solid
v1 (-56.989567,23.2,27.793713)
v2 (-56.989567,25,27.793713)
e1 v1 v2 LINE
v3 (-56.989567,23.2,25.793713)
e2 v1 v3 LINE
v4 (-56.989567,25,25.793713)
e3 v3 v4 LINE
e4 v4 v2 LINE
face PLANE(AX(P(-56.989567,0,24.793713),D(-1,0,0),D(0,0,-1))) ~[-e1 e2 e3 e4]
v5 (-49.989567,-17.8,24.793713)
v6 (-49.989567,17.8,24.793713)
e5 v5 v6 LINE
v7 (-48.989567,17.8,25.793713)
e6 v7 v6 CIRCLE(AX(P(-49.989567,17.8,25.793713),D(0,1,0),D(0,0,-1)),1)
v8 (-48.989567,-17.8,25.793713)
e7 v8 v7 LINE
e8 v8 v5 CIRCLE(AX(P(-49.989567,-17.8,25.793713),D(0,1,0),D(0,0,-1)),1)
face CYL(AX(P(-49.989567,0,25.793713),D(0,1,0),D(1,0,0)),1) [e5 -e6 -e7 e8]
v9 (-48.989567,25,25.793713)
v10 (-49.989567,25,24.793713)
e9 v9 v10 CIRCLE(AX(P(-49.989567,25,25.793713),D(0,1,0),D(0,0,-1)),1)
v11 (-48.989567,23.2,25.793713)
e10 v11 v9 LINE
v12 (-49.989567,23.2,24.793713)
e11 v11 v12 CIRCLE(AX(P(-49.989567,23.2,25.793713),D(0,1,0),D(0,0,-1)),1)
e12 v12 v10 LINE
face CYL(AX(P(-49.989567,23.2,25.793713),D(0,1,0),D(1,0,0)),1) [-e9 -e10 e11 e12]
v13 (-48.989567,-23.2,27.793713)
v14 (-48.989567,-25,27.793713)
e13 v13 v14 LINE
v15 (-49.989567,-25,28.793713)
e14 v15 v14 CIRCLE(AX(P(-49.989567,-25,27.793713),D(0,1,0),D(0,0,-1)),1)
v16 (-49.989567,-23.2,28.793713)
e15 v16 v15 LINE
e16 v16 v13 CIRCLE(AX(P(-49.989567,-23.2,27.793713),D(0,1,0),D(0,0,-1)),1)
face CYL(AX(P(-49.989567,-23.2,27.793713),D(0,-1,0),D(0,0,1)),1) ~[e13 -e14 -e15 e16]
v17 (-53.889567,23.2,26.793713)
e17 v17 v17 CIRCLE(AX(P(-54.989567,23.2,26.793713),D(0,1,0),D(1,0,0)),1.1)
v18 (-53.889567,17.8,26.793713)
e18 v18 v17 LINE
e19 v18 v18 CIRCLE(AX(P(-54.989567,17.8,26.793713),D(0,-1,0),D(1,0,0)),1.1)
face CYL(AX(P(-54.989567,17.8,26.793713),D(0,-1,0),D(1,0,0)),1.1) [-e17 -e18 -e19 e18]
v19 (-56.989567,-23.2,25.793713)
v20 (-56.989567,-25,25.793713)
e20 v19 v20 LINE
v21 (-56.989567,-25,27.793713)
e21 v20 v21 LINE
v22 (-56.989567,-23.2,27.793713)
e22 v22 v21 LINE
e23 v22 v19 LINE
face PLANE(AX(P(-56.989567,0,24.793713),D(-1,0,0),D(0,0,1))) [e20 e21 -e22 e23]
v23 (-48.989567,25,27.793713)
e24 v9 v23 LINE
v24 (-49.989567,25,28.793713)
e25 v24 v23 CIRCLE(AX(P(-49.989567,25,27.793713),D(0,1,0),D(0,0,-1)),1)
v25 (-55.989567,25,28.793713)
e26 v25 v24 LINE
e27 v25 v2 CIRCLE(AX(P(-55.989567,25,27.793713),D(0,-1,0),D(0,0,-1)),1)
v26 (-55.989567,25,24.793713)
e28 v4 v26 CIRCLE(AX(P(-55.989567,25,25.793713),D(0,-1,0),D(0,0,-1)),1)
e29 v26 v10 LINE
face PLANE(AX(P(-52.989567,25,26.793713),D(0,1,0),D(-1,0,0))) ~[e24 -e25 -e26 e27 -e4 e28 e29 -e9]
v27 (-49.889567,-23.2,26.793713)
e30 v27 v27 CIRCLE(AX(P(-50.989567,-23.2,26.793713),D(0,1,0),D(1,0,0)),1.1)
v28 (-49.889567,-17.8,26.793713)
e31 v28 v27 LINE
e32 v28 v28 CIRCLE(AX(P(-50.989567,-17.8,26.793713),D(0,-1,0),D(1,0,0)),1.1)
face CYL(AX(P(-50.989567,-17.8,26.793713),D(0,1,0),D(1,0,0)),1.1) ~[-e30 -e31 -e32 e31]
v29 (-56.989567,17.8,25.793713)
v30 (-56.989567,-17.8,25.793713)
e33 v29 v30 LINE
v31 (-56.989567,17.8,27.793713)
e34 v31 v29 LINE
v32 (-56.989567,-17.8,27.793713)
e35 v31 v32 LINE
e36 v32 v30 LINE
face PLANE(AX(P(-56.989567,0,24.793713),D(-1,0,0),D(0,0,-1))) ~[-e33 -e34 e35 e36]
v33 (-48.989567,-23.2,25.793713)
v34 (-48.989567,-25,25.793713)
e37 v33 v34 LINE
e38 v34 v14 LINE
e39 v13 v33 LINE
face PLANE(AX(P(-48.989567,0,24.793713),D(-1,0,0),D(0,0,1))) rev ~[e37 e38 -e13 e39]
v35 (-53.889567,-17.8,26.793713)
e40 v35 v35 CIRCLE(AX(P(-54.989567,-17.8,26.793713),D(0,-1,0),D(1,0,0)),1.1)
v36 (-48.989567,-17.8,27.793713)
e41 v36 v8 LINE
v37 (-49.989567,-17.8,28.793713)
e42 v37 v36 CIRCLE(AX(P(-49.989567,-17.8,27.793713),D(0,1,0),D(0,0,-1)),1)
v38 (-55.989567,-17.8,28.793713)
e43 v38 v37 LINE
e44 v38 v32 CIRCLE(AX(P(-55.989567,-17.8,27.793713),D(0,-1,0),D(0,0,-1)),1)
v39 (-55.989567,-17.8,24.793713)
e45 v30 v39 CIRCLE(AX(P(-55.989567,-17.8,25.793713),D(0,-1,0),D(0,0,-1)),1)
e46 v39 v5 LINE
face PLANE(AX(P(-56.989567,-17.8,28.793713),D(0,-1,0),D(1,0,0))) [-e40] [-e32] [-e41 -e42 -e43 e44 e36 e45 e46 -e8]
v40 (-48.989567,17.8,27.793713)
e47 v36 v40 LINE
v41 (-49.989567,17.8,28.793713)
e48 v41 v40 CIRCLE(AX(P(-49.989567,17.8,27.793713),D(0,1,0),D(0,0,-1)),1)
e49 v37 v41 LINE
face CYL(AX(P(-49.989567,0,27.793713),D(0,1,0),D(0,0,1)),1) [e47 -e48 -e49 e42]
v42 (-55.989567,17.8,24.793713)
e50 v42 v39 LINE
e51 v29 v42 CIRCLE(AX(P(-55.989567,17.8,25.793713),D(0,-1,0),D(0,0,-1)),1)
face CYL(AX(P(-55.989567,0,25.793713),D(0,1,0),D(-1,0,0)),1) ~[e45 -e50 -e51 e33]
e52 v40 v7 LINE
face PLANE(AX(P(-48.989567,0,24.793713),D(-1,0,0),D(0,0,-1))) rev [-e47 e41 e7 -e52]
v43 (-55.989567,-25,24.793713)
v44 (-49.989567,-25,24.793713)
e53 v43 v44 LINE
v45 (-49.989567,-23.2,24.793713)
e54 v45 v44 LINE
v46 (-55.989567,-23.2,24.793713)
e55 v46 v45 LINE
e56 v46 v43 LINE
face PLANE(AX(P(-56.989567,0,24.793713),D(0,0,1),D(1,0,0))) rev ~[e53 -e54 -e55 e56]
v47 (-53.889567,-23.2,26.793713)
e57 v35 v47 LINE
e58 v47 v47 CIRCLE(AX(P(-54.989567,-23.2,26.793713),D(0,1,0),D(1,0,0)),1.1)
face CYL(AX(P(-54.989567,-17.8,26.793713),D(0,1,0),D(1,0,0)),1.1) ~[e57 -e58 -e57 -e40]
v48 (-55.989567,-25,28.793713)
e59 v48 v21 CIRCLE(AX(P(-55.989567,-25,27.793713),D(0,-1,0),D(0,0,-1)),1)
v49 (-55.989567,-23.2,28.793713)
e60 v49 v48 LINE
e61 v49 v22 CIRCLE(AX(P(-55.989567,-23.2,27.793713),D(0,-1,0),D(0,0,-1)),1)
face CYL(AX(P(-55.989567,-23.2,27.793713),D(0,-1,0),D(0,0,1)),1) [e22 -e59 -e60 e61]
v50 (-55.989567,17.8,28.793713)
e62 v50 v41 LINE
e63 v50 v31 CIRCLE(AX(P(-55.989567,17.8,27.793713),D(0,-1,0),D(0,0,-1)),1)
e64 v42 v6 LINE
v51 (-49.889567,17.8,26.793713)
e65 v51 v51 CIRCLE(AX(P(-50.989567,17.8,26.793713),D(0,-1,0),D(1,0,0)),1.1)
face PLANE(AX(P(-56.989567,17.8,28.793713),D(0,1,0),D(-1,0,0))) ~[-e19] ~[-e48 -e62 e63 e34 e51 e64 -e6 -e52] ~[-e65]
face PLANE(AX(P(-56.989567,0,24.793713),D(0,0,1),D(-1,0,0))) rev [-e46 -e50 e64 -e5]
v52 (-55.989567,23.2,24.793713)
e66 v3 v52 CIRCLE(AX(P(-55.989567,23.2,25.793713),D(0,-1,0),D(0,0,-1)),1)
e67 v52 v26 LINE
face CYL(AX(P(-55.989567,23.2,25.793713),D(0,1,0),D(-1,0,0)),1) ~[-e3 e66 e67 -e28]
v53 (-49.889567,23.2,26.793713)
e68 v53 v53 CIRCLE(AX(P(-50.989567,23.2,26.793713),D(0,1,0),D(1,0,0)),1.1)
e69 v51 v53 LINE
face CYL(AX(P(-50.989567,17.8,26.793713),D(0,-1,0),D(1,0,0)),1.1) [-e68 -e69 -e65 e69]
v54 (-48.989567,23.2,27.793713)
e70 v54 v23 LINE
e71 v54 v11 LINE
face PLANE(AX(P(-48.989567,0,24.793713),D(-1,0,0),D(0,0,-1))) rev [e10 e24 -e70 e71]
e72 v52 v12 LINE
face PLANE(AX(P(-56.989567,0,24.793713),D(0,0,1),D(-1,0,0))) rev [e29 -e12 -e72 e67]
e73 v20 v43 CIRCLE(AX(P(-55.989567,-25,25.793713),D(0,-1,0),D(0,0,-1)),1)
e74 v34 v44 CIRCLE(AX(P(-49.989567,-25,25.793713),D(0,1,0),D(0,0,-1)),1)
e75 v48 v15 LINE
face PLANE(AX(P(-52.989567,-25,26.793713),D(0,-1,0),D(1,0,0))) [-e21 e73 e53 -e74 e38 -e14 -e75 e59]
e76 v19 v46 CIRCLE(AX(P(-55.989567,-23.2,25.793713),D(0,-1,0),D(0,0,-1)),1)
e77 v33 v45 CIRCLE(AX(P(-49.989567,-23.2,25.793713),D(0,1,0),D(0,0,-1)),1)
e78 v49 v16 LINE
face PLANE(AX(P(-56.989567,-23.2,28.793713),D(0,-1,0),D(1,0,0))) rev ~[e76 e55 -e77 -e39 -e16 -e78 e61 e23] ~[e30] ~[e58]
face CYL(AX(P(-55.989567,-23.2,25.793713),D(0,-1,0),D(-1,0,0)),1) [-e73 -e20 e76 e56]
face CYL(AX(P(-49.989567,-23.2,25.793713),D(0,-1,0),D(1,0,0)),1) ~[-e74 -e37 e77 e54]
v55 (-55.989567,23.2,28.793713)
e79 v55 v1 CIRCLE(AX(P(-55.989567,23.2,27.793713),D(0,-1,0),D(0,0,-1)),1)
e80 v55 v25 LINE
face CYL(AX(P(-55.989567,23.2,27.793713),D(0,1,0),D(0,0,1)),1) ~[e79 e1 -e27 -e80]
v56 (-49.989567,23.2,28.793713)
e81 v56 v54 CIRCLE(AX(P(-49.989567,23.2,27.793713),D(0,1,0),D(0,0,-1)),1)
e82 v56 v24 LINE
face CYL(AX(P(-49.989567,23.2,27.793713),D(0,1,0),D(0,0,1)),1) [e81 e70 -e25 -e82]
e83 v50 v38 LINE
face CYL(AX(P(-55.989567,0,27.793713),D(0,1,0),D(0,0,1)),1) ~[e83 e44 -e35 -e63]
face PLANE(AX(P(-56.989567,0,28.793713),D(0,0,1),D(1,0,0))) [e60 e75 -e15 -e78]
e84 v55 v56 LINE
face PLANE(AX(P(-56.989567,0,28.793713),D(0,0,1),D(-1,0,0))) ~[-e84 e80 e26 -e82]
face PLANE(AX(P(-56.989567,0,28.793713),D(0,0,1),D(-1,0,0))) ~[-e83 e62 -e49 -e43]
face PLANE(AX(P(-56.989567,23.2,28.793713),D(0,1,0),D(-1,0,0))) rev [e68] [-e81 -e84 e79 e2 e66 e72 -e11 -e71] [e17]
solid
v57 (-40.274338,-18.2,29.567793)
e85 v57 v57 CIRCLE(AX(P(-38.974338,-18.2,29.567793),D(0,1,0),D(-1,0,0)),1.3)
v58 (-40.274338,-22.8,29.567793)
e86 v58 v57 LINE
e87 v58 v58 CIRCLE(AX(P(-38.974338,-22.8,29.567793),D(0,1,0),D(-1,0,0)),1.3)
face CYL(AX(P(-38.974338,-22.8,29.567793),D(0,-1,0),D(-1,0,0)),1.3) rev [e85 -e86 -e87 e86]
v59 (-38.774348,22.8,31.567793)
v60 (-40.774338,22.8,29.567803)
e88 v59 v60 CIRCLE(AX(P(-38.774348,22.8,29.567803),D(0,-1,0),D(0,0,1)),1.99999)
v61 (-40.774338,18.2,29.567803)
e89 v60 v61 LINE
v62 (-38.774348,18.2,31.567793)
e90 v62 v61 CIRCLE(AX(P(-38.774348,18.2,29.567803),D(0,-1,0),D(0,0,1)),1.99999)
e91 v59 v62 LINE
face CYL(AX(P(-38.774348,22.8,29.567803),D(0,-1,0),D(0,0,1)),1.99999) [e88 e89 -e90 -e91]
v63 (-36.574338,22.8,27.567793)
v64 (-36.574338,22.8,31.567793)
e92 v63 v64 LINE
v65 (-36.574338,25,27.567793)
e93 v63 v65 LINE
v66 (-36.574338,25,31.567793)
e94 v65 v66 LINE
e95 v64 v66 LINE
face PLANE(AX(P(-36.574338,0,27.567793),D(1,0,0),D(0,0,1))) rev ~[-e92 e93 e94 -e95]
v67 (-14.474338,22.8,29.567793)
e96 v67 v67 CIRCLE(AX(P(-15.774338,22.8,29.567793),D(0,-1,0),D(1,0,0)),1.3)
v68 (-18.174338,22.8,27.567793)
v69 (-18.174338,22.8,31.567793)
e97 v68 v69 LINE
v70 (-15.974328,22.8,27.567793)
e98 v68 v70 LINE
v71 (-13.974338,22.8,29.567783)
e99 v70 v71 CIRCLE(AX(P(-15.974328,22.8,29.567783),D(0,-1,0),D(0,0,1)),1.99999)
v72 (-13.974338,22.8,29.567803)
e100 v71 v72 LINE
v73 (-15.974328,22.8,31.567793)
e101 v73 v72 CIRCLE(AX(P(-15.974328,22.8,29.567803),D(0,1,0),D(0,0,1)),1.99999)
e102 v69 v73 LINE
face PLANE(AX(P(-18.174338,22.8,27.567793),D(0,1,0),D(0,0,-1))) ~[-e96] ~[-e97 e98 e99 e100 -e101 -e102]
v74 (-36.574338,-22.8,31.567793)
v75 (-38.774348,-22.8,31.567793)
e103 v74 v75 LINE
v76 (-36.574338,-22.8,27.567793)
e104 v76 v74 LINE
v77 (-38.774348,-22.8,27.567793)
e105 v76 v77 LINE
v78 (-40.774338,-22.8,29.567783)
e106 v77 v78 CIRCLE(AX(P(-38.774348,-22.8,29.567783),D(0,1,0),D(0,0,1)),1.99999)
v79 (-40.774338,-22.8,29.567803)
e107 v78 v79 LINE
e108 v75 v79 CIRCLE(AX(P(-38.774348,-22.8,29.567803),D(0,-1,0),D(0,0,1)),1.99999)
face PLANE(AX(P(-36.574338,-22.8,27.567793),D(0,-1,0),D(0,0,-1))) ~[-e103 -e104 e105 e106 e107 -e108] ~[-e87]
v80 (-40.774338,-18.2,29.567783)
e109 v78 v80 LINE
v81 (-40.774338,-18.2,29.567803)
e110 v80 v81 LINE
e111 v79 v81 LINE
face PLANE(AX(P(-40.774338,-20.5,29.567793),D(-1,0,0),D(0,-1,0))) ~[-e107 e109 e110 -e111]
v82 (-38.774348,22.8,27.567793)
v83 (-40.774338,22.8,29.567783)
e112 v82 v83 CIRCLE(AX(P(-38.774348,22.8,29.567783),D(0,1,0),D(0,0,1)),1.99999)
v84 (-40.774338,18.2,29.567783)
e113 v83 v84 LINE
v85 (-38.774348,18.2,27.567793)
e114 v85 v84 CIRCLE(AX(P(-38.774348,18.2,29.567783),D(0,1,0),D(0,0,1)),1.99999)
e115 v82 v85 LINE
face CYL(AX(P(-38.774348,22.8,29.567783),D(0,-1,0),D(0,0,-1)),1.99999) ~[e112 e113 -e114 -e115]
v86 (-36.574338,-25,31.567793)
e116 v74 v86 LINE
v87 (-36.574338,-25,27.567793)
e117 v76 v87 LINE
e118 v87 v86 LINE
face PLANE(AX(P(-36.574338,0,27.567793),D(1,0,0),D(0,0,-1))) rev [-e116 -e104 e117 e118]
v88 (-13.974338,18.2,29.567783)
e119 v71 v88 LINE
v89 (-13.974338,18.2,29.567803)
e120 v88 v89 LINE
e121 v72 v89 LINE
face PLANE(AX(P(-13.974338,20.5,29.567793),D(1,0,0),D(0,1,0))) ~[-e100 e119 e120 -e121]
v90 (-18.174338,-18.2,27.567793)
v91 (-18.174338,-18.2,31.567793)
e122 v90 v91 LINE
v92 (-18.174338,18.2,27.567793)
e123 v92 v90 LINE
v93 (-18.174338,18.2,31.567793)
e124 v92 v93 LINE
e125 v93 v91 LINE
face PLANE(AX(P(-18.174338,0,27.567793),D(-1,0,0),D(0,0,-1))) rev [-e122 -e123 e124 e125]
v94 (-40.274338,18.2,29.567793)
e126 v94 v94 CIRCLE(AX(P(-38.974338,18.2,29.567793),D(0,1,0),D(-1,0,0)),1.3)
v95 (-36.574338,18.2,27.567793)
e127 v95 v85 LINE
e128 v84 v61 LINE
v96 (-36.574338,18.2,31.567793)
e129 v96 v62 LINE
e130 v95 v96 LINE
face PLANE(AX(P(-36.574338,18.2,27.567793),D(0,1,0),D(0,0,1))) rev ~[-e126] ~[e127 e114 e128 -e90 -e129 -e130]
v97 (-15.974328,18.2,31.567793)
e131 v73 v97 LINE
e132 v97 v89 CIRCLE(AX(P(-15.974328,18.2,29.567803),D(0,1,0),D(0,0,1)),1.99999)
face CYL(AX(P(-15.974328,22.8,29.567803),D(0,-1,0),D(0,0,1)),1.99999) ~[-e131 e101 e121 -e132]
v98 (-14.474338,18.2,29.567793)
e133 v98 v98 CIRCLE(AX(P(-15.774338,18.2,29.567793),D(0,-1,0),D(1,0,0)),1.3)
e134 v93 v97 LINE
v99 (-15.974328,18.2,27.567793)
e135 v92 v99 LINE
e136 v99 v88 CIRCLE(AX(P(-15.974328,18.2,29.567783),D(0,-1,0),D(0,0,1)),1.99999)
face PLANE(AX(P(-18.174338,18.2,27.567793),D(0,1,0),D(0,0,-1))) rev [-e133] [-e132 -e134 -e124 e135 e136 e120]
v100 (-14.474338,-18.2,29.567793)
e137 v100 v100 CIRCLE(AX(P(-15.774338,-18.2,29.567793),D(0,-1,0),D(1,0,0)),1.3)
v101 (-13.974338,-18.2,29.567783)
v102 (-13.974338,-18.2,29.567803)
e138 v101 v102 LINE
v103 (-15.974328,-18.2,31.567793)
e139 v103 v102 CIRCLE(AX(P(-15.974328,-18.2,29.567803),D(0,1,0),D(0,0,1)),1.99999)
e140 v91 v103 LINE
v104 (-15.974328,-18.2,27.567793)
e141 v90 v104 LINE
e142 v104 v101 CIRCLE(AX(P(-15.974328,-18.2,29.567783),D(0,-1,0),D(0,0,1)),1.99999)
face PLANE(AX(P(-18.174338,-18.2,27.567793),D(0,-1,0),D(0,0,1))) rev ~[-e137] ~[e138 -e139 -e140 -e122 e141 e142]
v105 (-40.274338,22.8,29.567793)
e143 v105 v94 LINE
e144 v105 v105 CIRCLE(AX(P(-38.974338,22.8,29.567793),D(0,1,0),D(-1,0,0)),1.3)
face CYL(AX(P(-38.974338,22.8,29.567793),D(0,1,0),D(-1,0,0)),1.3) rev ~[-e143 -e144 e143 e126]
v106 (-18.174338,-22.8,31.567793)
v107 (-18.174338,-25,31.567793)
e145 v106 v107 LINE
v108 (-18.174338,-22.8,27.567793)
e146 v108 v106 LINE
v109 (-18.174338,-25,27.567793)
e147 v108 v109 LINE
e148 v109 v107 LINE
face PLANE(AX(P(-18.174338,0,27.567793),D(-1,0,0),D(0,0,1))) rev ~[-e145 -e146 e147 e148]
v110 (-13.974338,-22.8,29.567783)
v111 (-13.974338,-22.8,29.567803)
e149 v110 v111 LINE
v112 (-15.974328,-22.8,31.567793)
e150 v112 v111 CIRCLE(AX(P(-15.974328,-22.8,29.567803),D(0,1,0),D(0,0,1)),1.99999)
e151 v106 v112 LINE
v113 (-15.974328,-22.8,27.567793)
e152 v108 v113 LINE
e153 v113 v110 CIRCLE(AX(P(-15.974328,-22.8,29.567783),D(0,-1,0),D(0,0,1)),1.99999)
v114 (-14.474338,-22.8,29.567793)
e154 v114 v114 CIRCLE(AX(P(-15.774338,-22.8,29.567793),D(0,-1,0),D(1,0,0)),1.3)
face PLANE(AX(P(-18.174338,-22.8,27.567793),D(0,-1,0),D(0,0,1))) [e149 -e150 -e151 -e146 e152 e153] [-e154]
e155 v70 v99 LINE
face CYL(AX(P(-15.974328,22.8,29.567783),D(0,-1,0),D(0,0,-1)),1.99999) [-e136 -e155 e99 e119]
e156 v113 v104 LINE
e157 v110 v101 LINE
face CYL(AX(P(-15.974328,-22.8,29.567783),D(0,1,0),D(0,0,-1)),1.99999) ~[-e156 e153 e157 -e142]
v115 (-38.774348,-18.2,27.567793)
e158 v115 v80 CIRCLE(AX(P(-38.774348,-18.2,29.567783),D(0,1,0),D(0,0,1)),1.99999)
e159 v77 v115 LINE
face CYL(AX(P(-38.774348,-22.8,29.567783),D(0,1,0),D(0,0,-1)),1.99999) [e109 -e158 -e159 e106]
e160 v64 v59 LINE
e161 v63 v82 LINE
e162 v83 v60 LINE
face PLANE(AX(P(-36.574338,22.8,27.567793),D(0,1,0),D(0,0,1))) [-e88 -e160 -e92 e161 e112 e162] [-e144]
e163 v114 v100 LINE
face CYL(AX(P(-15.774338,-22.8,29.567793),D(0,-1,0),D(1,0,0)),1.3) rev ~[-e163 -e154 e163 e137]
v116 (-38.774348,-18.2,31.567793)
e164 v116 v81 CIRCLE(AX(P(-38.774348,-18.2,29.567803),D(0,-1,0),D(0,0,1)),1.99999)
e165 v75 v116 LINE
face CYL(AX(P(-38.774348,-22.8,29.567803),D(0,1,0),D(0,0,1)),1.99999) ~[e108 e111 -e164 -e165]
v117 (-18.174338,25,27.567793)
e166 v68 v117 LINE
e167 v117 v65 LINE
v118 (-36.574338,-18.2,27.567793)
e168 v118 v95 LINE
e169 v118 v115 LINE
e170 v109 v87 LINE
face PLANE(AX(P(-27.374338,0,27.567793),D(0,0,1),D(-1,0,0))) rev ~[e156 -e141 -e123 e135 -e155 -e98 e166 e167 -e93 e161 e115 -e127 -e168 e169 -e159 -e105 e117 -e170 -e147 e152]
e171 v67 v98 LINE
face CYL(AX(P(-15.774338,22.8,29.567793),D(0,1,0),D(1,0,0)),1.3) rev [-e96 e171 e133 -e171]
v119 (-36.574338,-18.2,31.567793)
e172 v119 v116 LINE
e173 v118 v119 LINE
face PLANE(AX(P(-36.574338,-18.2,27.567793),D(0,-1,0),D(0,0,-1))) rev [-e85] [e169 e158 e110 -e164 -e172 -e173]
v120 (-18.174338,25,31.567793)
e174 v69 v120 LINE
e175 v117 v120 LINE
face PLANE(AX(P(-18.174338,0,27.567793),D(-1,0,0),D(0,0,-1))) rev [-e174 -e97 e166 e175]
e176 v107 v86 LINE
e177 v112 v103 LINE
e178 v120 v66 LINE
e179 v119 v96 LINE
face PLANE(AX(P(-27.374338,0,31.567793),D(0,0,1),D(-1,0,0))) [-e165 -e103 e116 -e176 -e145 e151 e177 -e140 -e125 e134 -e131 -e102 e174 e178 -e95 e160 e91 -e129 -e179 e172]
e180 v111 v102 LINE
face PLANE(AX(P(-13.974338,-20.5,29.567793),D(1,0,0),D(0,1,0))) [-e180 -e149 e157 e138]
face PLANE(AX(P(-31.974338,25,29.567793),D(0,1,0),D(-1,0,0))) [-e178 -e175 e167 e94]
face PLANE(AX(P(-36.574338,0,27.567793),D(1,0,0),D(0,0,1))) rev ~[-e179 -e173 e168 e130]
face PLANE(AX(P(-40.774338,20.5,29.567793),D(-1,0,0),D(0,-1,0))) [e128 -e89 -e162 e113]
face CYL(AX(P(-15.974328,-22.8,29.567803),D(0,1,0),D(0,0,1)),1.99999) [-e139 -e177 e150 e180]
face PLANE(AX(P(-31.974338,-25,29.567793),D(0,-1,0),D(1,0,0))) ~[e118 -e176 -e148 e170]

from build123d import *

# Parameters (mm, degrees)
F0_W      = 8
F0_H      = 4
F1_DEPTH  = 25
F2_W      = 8
F2_H      = 5.4
F3_DEPTH  = 25
F4_R      = 1.1
F5_DEPTH  = 7
F6_R      = 1
F8_W      = 9.2
F8_H      = 4
F9_DEPTH  = 25
F10_W     = 4.6
F10_H     = 4
F11_DEPTH = 4.2
F12_R     = 1.3
F13_DEPTH = 25
F14_R     = 1.99999


# Not quite as in the source:
# - a fillet or chamfer is up to 0.001 mm smaller than in the source, because OpenCascade refuses the exact size


with BuildPart() as f1:
    # F0 (on Front) → F1 (new body)
    with BuildSketch(Plane.XZ):
        with Locations((-52.9895666987, 26.7937131725)):
            Rectangle(F0_W, F0_H)
    extrude(amount=F1_DEPTH)

    # F2 (on face) → F3 (cut)
    with BuildSketch(Plane.XY.offset(28.7937131725)):
        with Locations((-52.9895666987, -20.5)):
            Rectangle(F2_W, F2_H)
    extrude(amount=-F3_DEPTH, mode=Mode.SUBTRACT)

    # F4 (on face) → F5 (join)
    with BuildSketch(Plane.XZ.offset(17.8)):
        with Locations((-54.9895666987, 26.7937131725)):
            Circle(F4_R)
        with Locations((-50.9895666987, 26.7937131725)):
            Circle(F4_R)
    extrude(amount=F5_DEPTH)

    # F6
    f6_edges = [f1.edges().sort_by_distance(p)[0] for p in [
        (-56.989567, -8.9, 28.793713),
        (-48.989567, -8.9, 28.793713),
        (-48.989567, -8.9, 24.793713),
        (-48.989567, -24.1, 28.793713),
        (-56.989567, -24.1, 28.793713),
        (-48.989567, -24.1, 24.793713),
        (-56.989567, -8.9, 24.793713),
        (-56.989567, -24.1, 24.793713),
    ]]
    fillet(f6_edges, radius=F6_R)

    # F7: F1 across plane


with BuildPart() as f1_1:
    add(f1.part)
    add(f1.part.mirror(Plane.XZ))


with BuildPart() as f9:
    # F8 (on Front) → F9 (new body)
    with BuildSketch(Plane.XZ):
        with Locations((-22.7743378759, 29.5677930117)):
            Rectangle(F8_W, F8_H)
    extrude(amount=F9_DEPTH)

    # F10 (on face) → F11 (join)
    with BuildSketch(Plane.YZ.offset(-18.1743378759)):
        with Locations((-20.5, 29.5677930117)):
            Rectangle(F10_W, F10_H)
    extrude(amount=F11_DEPTH)

    # F12 (on face) → F13 (cut)
    with BuildSketch(Plane.XZ.offset(22.8)):
        with Locations((-15.7743378759, 29.5677930117)):
            Circle(F12_R)
    extrude(amount=-F13_DEPTH, mode=Mode.SUBTRACT)

    # F14 (radius 2 in the source; OpenCascade refuses exactly that, so slightly less here)
    f14_edges = [f9.edges().sort_by_distance(p)[0] for p in [
        (-13.974338, -20.5, 31.567793),
        (-13.974338, -20.5, 27.567793),
    ]]
    fillet(f14_edges, radius=F14_R)

    # F15: F9 across face


with BuildPart() as f9_1:
    add(f9.part)
    add(f9.part.mirror(Plane(origin=(-27.3743378759, -12.5, 29.5677930117), x_dir=(0, -1, 0), z_dir=(-1, 0, 0))))

    # F16: F9 across face


with BuildPart() as f9_2:
    add(f9_1.part)
    add(f9_1.part.mirror(Plane(origin=(-27.3743378759, 0, 29.5677930117), x_dir=(-1, 0, 0), z_dir=(0, 1, 0))))


solid = Compound([f1_1.part, f9_2.part])
